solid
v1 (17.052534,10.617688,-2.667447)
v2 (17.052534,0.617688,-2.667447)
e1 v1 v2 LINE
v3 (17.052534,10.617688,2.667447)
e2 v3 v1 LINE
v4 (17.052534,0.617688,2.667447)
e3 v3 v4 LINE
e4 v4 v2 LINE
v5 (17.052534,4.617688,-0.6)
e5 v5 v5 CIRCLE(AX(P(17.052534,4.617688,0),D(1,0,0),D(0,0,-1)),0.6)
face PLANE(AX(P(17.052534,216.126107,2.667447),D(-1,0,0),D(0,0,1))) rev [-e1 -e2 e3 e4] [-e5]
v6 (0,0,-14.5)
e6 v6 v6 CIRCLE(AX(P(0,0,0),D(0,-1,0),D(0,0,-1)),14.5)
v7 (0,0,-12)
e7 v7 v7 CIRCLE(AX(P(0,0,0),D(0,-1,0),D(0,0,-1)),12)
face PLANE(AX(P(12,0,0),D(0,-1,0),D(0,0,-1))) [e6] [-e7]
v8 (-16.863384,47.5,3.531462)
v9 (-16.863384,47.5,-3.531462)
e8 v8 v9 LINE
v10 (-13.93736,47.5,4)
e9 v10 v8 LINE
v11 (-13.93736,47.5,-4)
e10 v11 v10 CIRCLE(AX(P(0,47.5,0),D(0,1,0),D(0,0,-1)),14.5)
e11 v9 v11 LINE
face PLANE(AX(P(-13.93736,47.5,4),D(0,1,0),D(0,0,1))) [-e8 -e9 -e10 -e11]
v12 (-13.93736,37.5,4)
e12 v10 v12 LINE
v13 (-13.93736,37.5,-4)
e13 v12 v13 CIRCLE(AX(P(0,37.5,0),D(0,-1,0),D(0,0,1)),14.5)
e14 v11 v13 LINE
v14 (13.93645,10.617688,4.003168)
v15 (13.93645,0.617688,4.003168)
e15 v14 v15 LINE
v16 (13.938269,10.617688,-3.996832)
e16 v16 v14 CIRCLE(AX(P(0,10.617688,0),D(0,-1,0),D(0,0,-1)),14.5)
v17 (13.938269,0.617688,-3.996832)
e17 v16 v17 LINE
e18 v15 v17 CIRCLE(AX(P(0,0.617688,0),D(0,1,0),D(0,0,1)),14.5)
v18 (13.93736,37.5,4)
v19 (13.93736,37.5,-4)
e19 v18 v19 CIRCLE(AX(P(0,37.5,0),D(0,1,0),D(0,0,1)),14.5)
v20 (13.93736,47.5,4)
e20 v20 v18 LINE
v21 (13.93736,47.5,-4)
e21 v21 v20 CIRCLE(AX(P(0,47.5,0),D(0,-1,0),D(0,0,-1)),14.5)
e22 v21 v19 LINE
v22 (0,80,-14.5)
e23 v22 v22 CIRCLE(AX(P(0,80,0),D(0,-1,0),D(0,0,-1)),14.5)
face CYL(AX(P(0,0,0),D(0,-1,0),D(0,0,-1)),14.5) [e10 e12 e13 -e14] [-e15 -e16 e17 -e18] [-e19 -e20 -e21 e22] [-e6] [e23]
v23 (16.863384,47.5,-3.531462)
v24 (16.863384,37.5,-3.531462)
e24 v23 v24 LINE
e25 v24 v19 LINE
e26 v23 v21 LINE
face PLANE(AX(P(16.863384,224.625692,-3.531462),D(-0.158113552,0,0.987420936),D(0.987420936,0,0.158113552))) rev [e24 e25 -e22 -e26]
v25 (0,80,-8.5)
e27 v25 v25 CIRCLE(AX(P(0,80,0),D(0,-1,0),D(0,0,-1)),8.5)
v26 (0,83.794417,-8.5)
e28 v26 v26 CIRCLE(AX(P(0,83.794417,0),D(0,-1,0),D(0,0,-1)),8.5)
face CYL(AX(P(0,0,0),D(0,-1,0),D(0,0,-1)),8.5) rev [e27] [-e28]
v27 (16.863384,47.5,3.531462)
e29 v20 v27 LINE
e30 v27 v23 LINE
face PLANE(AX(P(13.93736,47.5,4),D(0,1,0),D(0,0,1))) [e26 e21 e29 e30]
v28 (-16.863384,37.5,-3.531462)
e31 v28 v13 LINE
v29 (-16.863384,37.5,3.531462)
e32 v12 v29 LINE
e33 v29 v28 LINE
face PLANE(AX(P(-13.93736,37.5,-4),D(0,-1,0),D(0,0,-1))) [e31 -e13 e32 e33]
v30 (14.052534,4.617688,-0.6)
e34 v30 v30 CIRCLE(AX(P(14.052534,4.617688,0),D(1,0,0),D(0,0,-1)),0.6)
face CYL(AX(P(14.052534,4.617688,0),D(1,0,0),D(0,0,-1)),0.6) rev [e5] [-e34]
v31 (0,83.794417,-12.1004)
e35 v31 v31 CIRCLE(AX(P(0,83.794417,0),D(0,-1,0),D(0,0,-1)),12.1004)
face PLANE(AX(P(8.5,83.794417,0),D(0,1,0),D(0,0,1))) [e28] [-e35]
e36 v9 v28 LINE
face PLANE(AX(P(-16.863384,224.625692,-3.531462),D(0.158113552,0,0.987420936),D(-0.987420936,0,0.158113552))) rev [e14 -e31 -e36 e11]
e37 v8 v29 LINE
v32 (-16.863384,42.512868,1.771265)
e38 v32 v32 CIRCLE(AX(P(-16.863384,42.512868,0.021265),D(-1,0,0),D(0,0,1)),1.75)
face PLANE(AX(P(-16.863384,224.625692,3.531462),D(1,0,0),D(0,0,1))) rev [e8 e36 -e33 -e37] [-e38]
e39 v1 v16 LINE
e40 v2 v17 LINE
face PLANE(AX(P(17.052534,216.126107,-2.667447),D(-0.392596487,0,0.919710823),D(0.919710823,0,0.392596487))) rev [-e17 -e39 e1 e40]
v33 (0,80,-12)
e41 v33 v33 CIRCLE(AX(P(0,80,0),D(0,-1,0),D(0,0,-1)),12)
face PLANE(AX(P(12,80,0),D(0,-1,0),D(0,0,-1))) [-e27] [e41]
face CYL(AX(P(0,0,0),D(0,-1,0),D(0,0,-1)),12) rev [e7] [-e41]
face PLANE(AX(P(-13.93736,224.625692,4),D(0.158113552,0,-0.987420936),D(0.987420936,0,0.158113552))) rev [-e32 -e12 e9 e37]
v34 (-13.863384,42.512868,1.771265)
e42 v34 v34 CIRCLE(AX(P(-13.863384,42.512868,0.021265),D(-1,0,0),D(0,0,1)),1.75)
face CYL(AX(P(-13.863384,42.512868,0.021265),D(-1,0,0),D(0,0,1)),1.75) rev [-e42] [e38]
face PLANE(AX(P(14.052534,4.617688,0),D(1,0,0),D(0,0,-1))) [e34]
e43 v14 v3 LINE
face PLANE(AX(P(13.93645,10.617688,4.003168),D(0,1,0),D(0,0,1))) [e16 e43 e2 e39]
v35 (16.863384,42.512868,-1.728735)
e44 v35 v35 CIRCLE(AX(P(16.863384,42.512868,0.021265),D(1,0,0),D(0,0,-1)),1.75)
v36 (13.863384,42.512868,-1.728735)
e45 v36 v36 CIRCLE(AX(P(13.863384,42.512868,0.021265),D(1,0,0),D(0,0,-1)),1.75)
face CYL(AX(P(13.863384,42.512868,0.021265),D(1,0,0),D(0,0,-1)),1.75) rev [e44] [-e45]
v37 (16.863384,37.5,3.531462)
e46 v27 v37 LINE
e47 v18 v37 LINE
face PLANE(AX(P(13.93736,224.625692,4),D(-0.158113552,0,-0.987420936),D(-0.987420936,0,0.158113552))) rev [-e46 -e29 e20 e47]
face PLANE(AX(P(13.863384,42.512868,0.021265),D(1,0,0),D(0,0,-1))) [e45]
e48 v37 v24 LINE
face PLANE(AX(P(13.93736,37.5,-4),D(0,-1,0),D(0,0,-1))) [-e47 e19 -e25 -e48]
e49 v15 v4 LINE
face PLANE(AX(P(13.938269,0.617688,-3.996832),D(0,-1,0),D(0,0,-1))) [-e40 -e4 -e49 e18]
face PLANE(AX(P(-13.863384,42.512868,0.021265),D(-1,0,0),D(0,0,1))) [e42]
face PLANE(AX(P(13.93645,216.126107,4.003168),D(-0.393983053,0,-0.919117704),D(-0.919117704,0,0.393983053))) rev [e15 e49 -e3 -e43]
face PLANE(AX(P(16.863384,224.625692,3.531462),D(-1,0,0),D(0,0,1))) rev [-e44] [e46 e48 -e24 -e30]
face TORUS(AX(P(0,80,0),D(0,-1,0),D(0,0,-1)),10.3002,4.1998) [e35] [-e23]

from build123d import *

# Parameters (mm, degrees)
BOSS_EXTRUDE1_REACH        = 91.067
BOSS_EXTRUDE1_START_RADIUS = 14.5
BOSS_EXTRUDE1_END_RADIUS   = 14.5
SKETCH5_W                  = 8
SKETCH5_H                  = 10
CUT_EXTRUDE1_START         = -10
CUT_EXTRUDE1_DEPTH         = 10
SKETCH8_R                  = 1.75
CUT_EXTRUDE2_DEPTH         = 3
CUT_EXTRUDE3_START         = -3
SKETCH9_R                  = 1.75
CUT_EXTRUDE3_DEPTH         = 3
CUT_EXTRUDE5_DEPTH         = 10
CUT_EXTRUDE8_START         = -10
CUT_EXTRUDE8_DEPTH         = 10
SKETCH13_R                 = 0.6
CUT_EXTRUDE9_DEPTH         = 3


# Read off the part's stored shape, not the designer's step: Cut-Extrude1, Cut-Extrude8
with BuildPart() as part:
    # Sketch1 → Revolve1 (revolve)
    with BuildSketch(Plane.XY, mode=Mode.PRIVATE) as revolve1_sk:
        with BuildLine():
            Line((12, 0), (14.5, 0))
            Line((14.5, 0), (14.5, 80))
            ThreePointArc((14.5, 80), (13.849763488, 82.244753612), (12.100400466, 83.794416583))
            Line((12.100400466, 83.794416583), (8.5, 83.794416583))
            Line((8.5, 83.794416583), (8.5, 80))
            Line((8.5, 80), (12, 80))
            Line((12, 80), (12, 0))
        make_face()
    revolve(revolve1_sk.sketch.rotate(Axis((0, 0, 0), (0, 1, 0)), 90), axis=Axis((0, 0, 0), (0, 1, 0)))

    # Boss-Extrude1: from a cylinder face, 91.067 long prism both ways, kept between that surface and its translate by the depth
    boss_extrude1_start = Plane(origin=(0, 24.058844, 0), z_dir=(0, -1, 0)) * Cylinder(BOSS_EXTRUDE1_START_RADIUS, 249.016312, mode=Mode.PRIVATE)
    boss_extrude1_end = Plane(origin=(2.8, 24.058844, 0), z_dir=(0, -1, 0)) * Cylinder(BOSS_EXTRUDE1_END_RADIUS, 249.016312, mode=Mode.PRIVATE)
    # Sketch5 → Boss-Extrude1 (add, from a surface)
    with BuildSketch(Plane(origin=(0, 0, 0), x_dir=(0, 0, -1), z_dir=(1, 0, 0)), mode=Mode.PRIVATE) as boss_extrude1_sk1:
        with Locations((-0.003167699, 5.61768818)):
            Rectangle(SKETCH5_W, SKETCH5_H)
    boss_extrude1_tool1 = extrude(boss_extrude1_sk1.sketch, amount=BOSS_EXTRUDE1_REACH, both=True, mode=Mode.PRIVATE)
    # Sketch5 → Boss-Extrude1 (add, from a surface)
    with BuildSketch(Plane(origin=(0, 0, 0), x_dir=(0, 0, -1), z_dir=(1, 0, 0)), mode=Mode.PRIVATE) as boss_extrude1_sk2:
        with Locations((0, 42.5)):
            Rectangle(SKETCH5_W, SKETCH5_H)
    boss_extrude1_tool2 = extrude(boss_extrude1_sk2.sketch, amount=BOSS_EXTRUDE1_REACH, both=True, mode=Mode.PRIVATE)
    boss_extrude1 = ((boss_extrude1_tool1 - boss_extrude1_start) & boss_extrude1_end).solids().sort_by_distance((15.337359, 5.617688, 0.003168))[0] + ((boss_extrude1_tool2 - boss_extrude1_start) & boss_extrude1_end).solids().sort_by_distance((15.337359, 5.617688, 0.003168))[0]
    add(boss_extrude1)

    # Cut-Extrude1 outline → Cut-Extrude1 (cut)
    with BuildSketch(Plane(origin=(0, 47.5, 0), x_dir=(1, 0, 0), z_dir=(0, 1, 0)).offset(CUT_EXTRUDE1_START)):
        with BuildLine():
            Line((16.737359865, 4), (13.937359865, 4))
            Line((13.937359865, 4), (16.863384202, 3.531462132))
            ThreePointArc((16.863384202, 3.531462132), (16.802331913, 3.766258222), (16.737359865, 4))
        make_face()
        with BuildLine():
            ThreePointArc((16.737359865, -4), (16.802331913, -3.766258222), (16.863384202, -3.531462132))
            Line((16.863384202, -3.531462132), (13.937359865, -4))
            Line((13.937359865, -4), (16.737359865, -4))
        make_face()
        with BuildLine():
            ThreePointArc((16.863384202, -3.531462132), (17.3, 0), (16.863384202, 3.531462132))
            Line((16.863384202, 3.531462132), (16.863384202, -3.531462132))
        make_face()
    cut_extrude1 = extrude(amount=CUT_EXTRUDE1_DEPTH, mode=Mode.SUBTRACT)

    # Mirror2: Boss-Extrude1, Cut-Extrude1 across plane
    add(boss_extrude1.mirror(Plane(origin=(0, 0, 0), x_dir=(0, 0, 1), z_dir=(1, 0, 0))))
    add(cut_extrude1.mirror(Plane(origin=(0, 0, 0), x_dir=(0, 0, 1), z_dir=(1, 0, 0))), mode=Mode.SUBTRACT)

    # Sketch8 → Cut-Extrude2 (cut)
    with BuildSketch(Plane.ZY.offset(16.863384202)):
        with Locations((0.02126458, 42.512867657)):
            Circle(SKETCH8_R)
    extrude(amount=-CUT_EXTRUDE2_DEPTH, mode=Mode.SUBTRACT)

    # Sketch9 → Cut-Extrude3 (cut)
    with BuildSketch(Plane(origin=(16.863384202, 0, 0), x_dir=(0, 0, -1), z_dir=(1, 0, 0)).offset(CUT_EXTRUDE3_START)):
        with Locations(Location((-0.02126458, 42.512867657, 0), (0, 0, 180))):
            Circle(SKETCH9_R)
    extrude(amount=CUT_EXTRUDE3_DEPTH, mode=Mode.SUBTRACT)

    # Sketch11 → Cut-Extrude5 (cut)
    with BuildSketch(Plane(origin=(0, 10.61768818, 0), x_dir=(1, 0, 0), z_dir=(0, 1, 0))):
        with BuildLine():
            Line((-13.9382686, 3.996832301), (-16.7382686, 3.996832301))
            ThreePointArc((-16.7382686, 3.996832301), (-17.299999625, -0.003295577), (-16.73645035, -4.003167699))
            Line((-16.73645035, -4.003167699), (-13.93645035, -4.003167699))
            ThreePointArc((-13.93645035, -4.003167699), (-14.499999625, -0.003295577), (-13.9382686, 3.996832301))
        make_face()
    extrude(amount=-CUT_EXTRUDE5_DEPTH, mode=Mode.SUBTRACT)

    # Cut-Extrude8 outline → Cut-Extrude8 (cut)
    with BuildSketch(Plane(origin=(0, 10.61768818, 0), x_dir=(1, 0, 0), z_dir=(0, 1, 0)).offset(CUT_EXTRUDE8_START)):
        with BuildLine():
            Line((16.7382686, 3.996832301), (13.9382686, 3.996832301))
            Line((13.9382686, 3.996832301), (17.052533954, 2.667447447))
            ThreePointArc((17.052533954, 2.667447447), (16.91106492, 3.335842745), (16.7382686, 3.996832301))
        make_face()
        with BuildLine():
            ThreePointArc((16.73645035, -4.003167699), (16.910306381, -3.339049838), (17.052533954, -2.667447447))
            Line((17.052533954, -2.667447447), (13.93645035, -4.003167699))
            Line((13.93645035, -4.003167699), (16.73645035, -4.003167699))
        make_face()
        with BuildLine():
            ThreePointArc((17.052533954, -2.667447447), (17.3, 0), (17.052533954, 2.667447447))
            Line((17.052533954, 2.667447447), (17.052533954, -2.667447447))
        make_face()
    extrude(amount=CUT_EXTRUDE8_DEPTH, mode=Mode.SUBTRACT)

    # Sketch13 → Cut-Extrude9 (cut)
    with BuildSketch(Plane(origin=(17.052533954, 0, 0), x_dir=(0, 0, -1), z_dir=(1, 0, 0))):
        with Locations((0, 4.61768818)):
            Circle(SKETCH13_R)
    extrude(amount=-CUT_EXTRUDE9_DEPTH, mode=Mode.SUBTRACT)


solid = part.part
